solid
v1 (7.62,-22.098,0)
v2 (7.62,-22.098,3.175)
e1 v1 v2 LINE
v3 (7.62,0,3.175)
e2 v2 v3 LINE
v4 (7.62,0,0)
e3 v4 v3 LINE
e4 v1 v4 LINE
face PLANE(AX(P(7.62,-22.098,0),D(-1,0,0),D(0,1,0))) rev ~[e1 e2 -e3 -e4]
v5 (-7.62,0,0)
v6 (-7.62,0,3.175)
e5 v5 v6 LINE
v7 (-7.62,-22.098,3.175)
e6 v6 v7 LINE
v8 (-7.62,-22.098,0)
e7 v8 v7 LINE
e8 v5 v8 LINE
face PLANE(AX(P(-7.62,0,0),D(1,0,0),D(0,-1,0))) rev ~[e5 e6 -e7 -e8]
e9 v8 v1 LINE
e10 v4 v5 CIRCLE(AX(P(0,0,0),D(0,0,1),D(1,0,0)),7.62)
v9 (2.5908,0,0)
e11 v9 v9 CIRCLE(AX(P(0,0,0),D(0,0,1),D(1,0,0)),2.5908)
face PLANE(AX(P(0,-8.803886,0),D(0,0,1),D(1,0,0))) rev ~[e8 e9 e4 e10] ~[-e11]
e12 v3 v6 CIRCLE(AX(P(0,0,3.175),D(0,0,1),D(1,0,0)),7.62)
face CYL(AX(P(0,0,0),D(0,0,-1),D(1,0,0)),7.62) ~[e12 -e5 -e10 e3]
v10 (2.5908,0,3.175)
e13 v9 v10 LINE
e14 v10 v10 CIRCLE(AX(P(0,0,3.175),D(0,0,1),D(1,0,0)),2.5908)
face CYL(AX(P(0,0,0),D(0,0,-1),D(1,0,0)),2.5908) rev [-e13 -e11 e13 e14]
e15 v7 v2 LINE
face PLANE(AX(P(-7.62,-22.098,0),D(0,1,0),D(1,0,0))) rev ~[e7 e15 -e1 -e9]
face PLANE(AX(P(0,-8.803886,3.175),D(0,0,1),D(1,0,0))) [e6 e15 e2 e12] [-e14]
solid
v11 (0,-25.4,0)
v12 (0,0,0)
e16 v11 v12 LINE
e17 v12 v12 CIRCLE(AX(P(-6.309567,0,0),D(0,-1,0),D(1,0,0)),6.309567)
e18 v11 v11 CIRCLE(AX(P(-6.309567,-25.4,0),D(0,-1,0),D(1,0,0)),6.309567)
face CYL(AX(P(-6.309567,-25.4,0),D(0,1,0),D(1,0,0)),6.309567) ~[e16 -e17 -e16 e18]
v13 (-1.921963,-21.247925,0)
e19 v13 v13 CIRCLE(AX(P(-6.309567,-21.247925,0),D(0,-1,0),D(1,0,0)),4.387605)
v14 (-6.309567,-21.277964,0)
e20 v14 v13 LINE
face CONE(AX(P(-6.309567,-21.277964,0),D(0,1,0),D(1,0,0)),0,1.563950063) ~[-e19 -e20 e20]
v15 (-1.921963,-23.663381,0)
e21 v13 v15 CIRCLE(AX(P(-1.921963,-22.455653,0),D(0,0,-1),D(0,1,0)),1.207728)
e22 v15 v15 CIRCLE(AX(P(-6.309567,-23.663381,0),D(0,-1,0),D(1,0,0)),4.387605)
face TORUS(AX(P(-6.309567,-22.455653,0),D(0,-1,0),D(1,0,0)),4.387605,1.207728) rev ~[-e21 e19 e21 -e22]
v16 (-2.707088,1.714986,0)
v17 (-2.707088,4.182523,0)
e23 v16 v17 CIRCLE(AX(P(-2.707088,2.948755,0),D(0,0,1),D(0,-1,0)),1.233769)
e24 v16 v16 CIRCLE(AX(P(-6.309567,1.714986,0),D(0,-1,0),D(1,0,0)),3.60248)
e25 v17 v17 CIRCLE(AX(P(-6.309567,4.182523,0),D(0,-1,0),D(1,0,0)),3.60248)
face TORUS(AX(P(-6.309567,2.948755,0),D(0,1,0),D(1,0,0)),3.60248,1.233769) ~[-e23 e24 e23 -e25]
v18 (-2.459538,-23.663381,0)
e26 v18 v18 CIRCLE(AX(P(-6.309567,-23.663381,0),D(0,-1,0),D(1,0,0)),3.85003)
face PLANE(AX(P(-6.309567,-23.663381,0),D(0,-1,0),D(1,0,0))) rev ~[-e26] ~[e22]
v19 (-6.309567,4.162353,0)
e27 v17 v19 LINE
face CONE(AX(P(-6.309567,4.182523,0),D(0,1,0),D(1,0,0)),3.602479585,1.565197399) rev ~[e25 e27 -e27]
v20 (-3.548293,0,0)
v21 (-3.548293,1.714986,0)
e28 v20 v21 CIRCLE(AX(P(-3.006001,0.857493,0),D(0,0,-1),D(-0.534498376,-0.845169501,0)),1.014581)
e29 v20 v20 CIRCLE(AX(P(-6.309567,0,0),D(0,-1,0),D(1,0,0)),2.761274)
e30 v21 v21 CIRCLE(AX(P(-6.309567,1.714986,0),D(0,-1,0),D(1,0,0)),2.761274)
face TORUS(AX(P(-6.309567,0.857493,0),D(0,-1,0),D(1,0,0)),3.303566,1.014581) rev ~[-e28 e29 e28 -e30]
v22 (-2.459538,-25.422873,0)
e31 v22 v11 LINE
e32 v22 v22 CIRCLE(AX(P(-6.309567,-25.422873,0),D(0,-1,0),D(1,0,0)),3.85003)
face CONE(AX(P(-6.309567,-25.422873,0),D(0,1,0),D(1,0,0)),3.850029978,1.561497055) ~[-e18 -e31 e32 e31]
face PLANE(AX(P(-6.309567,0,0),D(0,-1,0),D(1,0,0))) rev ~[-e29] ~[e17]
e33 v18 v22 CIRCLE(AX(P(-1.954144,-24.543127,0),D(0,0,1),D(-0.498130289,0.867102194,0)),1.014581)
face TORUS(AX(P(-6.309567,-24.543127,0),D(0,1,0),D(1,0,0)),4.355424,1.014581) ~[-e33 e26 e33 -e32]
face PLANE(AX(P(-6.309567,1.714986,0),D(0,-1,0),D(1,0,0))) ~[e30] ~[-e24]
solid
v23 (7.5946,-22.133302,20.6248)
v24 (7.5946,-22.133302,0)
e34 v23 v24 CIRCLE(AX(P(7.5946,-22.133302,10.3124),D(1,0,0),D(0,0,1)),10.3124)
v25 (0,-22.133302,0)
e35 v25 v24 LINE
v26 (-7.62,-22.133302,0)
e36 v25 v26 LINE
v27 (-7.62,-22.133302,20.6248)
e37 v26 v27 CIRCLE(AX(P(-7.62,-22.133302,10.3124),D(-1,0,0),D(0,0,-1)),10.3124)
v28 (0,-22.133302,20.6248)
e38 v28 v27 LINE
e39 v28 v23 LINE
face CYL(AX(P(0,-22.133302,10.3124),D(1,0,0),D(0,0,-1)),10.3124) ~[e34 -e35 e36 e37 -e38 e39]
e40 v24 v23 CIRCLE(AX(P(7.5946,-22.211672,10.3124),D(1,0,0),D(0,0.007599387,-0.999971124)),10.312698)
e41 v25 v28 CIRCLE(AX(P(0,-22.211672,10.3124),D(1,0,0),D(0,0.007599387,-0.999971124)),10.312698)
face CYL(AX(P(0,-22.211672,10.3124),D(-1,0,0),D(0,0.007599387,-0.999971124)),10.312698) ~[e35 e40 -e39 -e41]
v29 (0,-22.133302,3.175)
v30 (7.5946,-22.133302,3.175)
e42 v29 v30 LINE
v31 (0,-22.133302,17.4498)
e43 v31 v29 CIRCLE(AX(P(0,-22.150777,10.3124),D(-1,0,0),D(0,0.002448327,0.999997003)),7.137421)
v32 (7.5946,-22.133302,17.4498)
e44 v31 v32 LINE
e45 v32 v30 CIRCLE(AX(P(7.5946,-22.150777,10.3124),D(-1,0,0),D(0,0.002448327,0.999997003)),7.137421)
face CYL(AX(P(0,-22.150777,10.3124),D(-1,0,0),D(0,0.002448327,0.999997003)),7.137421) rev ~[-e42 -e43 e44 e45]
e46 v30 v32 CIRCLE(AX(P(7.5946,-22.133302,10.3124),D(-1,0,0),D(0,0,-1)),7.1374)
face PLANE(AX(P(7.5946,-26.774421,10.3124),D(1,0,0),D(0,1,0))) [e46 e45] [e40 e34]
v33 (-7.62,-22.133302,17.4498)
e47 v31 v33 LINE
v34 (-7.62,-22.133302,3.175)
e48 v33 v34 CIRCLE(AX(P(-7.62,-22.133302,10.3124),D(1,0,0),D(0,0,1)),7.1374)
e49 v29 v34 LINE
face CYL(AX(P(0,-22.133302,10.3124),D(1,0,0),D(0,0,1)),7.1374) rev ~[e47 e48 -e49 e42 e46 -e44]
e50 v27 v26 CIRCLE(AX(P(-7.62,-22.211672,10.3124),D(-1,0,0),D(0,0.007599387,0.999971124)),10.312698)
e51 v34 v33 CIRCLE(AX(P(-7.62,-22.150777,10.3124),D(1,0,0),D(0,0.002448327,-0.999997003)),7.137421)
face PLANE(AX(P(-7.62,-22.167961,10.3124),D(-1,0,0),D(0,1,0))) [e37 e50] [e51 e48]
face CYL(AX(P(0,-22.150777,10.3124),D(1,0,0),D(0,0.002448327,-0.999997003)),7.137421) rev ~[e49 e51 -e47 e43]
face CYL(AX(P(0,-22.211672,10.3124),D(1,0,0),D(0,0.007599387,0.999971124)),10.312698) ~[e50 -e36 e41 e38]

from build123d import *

# Parameters (mm, degrees)
F2_R     = 2.5908
F4_DEPTH = 3.175
F5_DEPTH = 7.5946
F6_DEPTH = 7.62


with BuildPart() as f1:
    # F0 (on Top) → F1 (revolve)
    with BuildSketch(Plane.XY):
        with BuildLine():
            Line((0, -25.4), (0, 0))
            Line((0, 0), (-3.5482933745, 0))
            ThreePointArc((-3.5482933745, 0), (-4.0205825687, 0.8574930835), (-3.5482933745, 1.7149861669))
            Line((-3.5482933745, 1.7149861669), (-2.7070879005, 1.7149861669))
            ThreePointArc((-2.7070879005, 1.7149861669), (-1.4733193675, 2.9487546999), (-2.7070879005, 4.1825232329))
            Line((-2.7070879005, 4.1825232329), (-6.309567485, 4.1623529978))
            Line((-6.309567485, 4.1623529978), (-6.309567485, -21.2779641151))
            Line((-6.309567485, -21.2779641151), (-1.9219625974, -21.2479249458))
            ThreePointArc((-1.9219625974, -21.2479249458), (-0.7142343675, -22.4556531757), (-1.9219625974, -23.6633814056))
            Line((-1.9219625974, -23.6633814056), (-2.4595375075, -23.6633814056))
            ThreePointArc((-2.4595375075, -23.6633814056), (-2.9687250789, -24.5431269868), (-2.4595375075, -25.422872568))
            Line((-2.4595375075, -25.422872568), (0, -25.4))
        make_face()
    revolve(axis=Axis((-6.309567485, -8.5578055587, 0), (0, -1, 0)))


with BuildPart() as f4:
    # F2 (on Top) → F4 (new body)
    with BuildSketch(Plane.XY):
        with BuildLine():
            Line((7.62, -22.098), (7.62, 0))
            ThreePointArc((7.62, 0), (0, 7.62), (-7.62, 0))
            Line((-7.62, 0), (-7.62, -22.098))
            Line((-7.62, -22.098), (7.62, -22.098))
        make_face()
        Circle(F2_R, mode=Mode.SUBTRACT)
    extrude(amount=F4_DEPTH)


with BuildPart() as f5:
    # F3 (on Right) → F5 (new body)
    with BuildSketch(Plane.YZ):
        with BuildLine():
            Line((-22.1333019435, 17.4498), (-22.1333019435, 20.6248))
            ThreePointArc((-22.1333019435, 20.6248), (-32.4457019435, 10.3124), (-22.1333019435, 0))
            Line((-22.1333019435, 0), (-22.1333019435, 3.175))
            ThreePointArc((-22.1333019435, 3.175), (-29.2707019435, 10.3124), (-22.1333019435, 17.4498))
        make_face()
        with BuildLine():
            ThreePointArc((-22.1333019435, 0), (-11.8989743379, 10.3124), (-22.1333019435, 20.6248))
            Line((-22.1333019435, 20.6248), (-22.1333019435, 17.4498))
            ThreePointArc((-22.1333019435, 17.4498), (-15.0133552942, 10.3124), (-22.1333019435, 3.175))
            Line((-22.1333019435, 3.175), (-22.1333019435, 0))
        make_face()
    extrude(amount=F5_DEPTH)

    # F5_face (on face) + F3 (on Right) → F6 (join)
    with BuildSketch(Plane(origin=(0, -22.2003075757, 10.3124), x_dir=(0, 1, 0), z_dir=(-1, 0, 0))):
        with BuildLine():
            ThreePointArc((0.0670056321, 10.3124), (-10.2453943679, 0), (0.0670056321, -10.3124))
            ThreePointArc((0.0670056321, -10.3124), (10.3013332378, 0), (0.0670056321, 10.3124))
        make_face()
        with BuildLine():
            ThreePointArc((0.0670056321, -7.1374), (-7.0703943679, 0), (0.0670056321, 7.1374))
            ThreePointArc((0.0670056321, 7.1374), (7.1869522815, 0), (0.0670056321, -7.1374))
        make_face(mode=Mode.SUBTRACT)
    with BuildSketch(Plane.YZ):
        with BuildLine():
            Line((-22.1333019435, 17.4498), (-22.1333019435, 20.6248))
            ThreePointArc((-22.1333019435, 20.6248), (-32.4457019435, 10.3124), (-22.1333019435, 0))
            Line((-22.1333019435, 0), (-22.1333019435, 3.175))
            ThreePointArc((-22.1333019435, 3.175), (-29.2707019435, 10.3124), (-22.1333019435, 17.4498))
        make_face()
        with BuildLine():
            ThreePointArc((-22.1333019435, 0), (-11.8989743379, 10.3124), (-22.1333019435, 20.6248))
            Line((-22.1333019435, 20.6248), (-22.1333019435, 17.4498))
            ThreePointArc((-22.1333019435, 17.4498), (-15.0133552942, 10.3124), (-22.1333019435, 3.175))
            Line((-22.1333019435, 3.175), (-22.1333019435, 0))
        make_face()
    extrude(amount=F6_DEPTH, dir=(-1, 0, 0))


solid = Compound([f1.part, f4.part, f5.part])
